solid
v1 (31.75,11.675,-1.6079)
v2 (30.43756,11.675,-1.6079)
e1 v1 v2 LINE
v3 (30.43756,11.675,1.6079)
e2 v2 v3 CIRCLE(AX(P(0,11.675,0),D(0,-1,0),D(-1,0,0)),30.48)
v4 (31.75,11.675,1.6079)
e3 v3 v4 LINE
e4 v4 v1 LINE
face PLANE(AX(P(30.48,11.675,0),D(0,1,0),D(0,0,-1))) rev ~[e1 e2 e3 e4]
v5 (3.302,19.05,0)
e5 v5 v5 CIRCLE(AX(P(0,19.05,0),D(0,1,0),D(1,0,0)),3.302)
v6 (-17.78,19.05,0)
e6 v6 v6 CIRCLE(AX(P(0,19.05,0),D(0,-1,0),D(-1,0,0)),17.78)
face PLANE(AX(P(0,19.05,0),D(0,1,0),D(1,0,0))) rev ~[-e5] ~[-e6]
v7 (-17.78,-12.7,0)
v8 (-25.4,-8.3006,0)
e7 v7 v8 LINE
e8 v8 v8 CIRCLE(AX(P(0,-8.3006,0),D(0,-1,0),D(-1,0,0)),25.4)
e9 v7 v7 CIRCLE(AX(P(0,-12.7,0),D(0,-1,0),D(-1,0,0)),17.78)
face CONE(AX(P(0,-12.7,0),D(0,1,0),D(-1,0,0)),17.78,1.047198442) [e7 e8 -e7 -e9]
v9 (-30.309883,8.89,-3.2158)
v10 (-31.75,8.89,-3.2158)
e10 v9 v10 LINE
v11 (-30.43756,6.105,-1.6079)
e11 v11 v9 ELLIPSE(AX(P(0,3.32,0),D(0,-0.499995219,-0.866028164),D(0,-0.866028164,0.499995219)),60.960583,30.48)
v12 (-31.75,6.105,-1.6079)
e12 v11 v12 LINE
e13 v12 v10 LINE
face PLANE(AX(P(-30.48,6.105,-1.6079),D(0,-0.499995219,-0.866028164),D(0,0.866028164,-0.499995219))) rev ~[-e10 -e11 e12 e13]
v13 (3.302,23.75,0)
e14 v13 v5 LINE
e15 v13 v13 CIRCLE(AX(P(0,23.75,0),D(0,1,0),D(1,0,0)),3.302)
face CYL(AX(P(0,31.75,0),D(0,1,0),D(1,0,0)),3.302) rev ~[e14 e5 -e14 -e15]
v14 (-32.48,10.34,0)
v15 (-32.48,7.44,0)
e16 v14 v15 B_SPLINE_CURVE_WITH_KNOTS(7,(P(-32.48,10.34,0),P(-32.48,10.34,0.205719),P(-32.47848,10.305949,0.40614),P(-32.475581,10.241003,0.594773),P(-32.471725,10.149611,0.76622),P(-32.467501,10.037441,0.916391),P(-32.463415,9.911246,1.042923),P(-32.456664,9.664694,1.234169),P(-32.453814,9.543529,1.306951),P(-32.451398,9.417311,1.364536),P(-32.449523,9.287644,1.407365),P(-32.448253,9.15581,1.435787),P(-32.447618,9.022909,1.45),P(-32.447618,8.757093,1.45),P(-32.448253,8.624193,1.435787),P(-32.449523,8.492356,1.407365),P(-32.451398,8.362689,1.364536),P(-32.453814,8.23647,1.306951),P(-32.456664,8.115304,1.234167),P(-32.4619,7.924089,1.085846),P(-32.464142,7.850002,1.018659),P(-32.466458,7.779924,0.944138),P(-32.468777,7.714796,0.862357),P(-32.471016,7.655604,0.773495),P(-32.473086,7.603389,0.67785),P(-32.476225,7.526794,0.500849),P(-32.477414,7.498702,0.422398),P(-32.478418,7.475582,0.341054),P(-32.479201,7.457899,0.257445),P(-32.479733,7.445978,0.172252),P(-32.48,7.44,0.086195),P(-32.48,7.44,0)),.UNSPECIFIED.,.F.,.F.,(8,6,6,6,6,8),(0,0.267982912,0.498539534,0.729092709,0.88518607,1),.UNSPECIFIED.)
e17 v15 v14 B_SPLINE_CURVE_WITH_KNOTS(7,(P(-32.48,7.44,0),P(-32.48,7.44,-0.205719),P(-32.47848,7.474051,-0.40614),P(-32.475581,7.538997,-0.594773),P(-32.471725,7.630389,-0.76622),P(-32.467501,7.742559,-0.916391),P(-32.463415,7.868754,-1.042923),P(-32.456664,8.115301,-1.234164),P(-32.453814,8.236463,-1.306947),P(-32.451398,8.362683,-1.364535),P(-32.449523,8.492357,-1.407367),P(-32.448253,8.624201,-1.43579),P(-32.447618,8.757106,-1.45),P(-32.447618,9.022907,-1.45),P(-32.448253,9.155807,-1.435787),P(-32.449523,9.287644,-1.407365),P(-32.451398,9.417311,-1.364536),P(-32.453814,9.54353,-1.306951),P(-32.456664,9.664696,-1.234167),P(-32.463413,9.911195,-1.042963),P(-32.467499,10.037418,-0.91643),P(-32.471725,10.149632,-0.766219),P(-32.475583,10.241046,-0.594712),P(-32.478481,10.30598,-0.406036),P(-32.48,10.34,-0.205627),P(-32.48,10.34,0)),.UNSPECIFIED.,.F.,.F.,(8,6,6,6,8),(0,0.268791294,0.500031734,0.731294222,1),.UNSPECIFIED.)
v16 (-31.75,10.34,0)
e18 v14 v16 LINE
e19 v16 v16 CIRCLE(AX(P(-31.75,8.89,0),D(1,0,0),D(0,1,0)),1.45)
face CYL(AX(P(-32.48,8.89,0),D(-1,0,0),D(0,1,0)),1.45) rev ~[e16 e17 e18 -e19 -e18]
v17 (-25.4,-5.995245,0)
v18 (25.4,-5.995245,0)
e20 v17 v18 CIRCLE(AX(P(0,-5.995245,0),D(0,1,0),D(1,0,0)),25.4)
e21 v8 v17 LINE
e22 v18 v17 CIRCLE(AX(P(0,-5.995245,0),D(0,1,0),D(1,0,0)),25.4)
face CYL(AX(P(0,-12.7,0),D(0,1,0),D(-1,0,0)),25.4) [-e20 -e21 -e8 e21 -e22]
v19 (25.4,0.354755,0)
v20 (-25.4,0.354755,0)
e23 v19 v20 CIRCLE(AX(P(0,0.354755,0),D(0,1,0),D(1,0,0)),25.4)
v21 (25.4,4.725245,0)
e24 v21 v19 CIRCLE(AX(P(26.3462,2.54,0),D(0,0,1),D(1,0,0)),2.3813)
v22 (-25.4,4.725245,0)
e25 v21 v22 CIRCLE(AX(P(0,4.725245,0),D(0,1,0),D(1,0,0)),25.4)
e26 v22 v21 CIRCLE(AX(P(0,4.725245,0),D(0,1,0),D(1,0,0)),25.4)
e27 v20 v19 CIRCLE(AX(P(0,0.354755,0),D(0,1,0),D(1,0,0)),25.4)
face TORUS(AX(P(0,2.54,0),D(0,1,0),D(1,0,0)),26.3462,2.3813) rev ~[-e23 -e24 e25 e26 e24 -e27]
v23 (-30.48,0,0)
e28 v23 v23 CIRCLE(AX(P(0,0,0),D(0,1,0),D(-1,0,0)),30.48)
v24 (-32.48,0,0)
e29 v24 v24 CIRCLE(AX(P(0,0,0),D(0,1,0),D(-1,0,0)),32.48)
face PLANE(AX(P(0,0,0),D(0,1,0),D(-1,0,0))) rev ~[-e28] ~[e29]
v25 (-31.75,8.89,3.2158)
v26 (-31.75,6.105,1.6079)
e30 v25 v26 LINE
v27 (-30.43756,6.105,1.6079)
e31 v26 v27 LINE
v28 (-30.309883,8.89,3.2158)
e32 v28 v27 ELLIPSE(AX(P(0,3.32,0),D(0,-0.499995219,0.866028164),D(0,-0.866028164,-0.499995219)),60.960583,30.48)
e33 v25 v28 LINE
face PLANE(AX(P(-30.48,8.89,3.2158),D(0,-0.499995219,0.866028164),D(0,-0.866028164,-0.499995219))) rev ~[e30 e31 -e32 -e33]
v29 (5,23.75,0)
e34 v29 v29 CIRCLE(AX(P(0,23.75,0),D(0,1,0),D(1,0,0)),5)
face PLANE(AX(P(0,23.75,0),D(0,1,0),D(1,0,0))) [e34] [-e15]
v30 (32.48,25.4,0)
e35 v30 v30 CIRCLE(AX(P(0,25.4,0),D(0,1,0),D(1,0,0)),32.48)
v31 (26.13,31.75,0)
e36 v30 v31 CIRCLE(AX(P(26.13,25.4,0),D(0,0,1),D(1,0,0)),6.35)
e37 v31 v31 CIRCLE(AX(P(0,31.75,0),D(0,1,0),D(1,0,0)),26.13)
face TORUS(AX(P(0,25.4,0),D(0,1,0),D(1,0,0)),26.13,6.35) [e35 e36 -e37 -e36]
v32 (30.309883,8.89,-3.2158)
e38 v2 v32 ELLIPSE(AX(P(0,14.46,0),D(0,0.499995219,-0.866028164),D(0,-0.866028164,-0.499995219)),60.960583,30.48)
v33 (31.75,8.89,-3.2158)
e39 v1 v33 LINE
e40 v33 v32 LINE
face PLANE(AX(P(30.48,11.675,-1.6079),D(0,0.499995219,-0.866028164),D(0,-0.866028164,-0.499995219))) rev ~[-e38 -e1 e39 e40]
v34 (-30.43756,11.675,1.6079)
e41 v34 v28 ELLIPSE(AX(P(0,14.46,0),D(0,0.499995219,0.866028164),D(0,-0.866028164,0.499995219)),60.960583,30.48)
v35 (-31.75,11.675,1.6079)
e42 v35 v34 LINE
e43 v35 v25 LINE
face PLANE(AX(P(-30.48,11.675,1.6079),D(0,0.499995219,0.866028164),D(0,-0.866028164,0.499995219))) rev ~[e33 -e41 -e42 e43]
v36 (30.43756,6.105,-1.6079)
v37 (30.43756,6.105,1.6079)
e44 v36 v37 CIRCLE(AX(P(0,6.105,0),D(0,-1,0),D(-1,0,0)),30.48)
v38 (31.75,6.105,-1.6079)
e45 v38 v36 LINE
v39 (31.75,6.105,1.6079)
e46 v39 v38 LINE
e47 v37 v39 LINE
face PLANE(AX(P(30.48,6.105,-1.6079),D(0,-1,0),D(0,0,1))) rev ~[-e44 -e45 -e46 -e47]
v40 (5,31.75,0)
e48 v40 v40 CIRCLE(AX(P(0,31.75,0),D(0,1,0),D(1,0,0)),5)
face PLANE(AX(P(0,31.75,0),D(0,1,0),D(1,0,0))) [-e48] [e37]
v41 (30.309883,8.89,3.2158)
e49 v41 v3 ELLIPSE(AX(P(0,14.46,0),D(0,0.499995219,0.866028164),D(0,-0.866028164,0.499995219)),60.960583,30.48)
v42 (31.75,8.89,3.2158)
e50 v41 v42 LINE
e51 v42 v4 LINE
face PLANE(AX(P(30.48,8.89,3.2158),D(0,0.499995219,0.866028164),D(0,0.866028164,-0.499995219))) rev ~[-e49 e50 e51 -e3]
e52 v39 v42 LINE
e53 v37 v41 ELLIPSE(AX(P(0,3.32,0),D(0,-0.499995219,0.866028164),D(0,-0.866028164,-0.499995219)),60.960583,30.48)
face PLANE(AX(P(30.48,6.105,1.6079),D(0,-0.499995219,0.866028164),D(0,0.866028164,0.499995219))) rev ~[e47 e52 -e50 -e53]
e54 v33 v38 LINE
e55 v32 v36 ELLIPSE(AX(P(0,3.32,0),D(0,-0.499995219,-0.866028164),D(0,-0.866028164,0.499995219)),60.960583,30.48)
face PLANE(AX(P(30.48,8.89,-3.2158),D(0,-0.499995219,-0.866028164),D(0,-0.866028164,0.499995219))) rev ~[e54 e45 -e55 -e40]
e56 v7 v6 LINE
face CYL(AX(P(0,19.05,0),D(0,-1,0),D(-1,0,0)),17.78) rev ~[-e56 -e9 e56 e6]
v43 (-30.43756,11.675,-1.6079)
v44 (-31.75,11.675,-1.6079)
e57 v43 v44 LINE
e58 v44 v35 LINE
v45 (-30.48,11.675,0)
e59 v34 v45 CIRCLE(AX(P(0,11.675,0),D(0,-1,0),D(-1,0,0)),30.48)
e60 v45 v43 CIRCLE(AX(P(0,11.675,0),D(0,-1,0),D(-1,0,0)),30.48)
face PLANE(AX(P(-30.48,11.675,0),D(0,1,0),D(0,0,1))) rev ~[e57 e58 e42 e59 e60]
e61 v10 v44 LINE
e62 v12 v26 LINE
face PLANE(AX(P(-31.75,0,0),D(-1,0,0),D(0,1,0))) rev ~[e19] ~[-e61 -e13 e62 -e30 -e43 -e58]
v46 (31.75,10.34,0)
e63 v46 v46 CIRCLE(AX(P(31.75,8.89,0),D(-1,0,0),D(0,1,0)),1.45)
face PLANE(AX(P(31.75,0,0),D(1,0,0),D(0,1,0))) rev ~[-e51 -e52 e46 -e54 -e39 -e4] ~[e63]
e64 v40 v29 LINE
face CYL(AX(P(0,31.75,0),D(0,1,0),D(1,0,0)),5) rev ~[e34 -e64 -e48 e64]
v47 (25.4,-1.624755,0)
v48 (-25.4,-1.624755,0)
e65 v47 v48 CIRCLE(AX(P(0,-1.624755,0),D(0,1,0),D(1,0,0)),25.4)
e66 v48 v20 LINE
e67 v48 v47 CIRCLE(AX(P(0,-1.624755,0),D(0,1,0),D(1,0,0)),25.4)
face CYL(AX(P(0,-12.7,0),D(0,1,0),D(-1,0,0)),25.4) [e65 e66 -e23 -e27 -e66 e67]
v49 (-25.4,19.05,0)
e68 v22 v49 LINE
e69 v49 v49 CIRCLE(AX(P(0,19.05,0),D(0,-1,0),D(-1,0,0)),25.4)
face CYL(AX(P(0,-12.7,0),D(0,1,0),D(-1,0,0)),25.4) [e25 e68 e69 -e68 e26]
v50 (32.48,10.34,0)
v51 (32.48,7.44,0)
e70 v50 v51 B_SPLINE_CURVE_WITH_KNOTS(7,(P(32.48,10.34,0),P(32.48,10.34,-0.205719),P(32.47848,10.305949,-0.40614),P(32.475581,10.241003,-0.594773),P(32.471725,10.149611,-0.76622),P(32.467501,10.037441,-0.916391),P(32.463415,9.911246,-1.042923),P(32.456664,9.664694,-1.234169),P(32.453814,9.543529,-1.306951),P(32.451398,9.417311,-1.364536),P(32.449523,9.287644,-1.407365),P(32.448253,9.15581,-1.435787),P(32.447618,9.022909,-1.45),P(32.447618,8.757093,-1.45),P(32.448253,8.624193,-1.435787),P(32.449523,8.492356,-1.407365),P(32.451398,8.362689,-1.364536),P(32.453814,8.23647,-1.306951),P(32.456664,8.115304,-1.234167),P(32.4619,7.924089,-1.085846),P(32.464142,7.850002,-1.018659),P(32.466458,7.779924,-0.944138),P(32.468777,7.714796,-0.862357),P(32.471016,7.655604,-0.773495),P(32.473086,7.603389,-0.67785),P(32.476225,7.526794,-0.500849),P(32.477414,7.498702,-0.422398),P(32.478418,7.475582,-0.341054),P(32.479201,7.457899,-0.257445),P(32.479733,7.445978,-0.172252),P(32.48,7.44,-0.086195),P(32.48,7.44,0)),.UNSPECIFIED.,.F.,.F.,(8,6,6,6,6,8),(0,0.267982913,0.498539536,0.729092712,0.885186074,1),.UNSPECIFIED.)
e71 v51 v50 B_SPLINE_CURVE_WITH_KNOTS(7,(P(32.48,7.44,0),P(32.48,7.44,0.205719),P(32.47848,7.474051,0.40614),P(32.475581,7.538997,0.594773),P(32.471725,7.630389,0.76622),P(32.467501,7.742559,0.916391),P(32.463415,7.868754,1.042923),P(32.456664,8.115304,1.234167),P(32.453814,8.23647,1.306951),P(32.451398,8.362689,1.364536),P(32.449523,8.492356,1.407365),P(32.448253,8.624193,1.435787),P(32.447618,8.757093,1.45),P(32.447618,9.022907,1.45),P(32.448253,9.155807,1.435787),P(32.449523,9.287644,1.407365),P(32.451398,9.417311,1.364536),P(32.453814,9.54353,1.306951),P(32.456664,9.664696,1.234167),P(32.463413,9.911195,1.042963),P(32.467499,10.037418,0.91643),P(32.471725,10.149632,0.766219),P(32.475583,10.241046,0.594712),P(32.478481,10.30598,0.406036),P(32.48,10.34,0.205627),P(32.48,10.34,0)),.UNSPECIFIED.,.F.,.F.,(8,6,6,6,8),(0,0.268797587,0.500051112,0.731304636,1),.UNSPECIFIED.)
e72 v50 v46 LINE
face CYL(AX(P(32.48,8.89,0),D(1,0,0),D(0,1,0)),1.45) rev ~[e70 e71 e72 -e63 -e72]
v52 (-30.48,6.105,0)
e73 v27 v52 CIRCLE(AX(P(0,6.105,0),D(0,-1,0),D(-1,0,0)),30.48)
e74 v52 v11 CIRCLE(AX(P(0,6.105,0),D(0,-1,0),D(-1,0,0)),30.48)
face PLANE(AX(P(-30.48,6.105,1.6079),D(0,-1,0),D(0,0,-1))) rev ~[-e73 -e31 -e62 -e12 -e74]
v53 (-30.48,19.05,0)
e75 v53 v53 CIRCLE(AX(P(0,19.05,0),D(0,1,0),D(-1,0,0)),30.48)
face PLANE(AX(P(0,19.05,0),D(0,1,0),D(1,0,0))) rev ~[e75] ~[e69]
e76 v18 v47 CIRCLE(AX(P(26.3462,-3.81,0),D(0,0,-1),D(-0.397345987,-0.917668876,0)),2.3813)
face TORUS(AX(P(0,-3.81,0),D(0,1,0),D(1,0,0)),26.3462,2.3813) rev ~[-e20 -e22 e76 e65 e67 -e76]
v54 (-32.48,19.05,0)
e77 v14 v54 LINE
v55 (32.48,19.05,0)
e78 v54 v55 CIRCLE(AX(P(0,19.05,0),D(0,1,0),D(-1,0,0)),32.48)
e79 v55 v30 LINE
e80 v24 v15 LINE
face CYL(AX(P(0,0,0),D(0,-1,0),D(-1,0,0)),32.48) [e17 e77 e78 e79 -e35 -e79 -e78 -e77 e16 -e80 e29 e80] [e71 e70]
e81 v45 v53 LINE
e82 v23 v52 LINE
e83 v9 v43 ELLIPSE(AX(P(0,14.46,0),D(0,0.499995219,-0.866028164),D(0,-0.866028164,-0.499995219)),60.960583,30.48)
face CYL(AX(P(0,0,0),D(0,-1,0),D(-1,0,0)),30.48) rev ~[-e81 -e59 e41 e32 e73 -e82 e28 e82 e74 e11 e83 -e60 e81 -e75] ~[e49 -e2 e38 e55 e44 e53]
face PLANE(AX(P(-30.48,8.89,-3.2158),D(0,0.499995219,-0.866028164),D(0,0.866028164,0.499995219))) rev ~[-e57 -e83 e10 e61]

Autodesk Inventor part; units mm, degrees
ref_plane "XZ Plane" through (0, 0, 0) normal (0, 1, 0) x (-1, 0, 0)
sketch "Sketch1" plane through (0, 0, 0) normal (0, 1, 0) x (-1, 0, 0)
  circle A0 centre (0, 0) radius 30.48
  circle A1 centre (0, 0) radius 32.48
  dimension "d0" = 60.96
  dimension "d2" = 2
extrude "Extrusion1" add sketch "Sketch1" along normal blind 19.05
sketch "Sketch2" plane through (0, 19.05, 0) normal (0, 1, 0) x (1, 0, 0)
  circle A0 centre (0, 0) radius 32.48
  circle A1 centre (0, 0) radius 32.48 projected
extrude "Extrusion2" add sketch "Sketch2" along normal blind 12.7
fillet "Fillet1" radius 6.35 1 edges at (-32.48, 31.75, 0)
sketch "Sketch6" plane through (0, 31.75, 0) normal (0, 1, 0) x (1, 0, 0)
  circle A0 centre (0, 0) radius 3.302
  dimension "d15" = 6.604
extrude "Extrusion5" cut sketch "Sketch6" against normal up to surface (12.7 mm away)
sketch "Sketch10" plane through (0, 0, 0) normal (0, 0, 1) x (1, 0, 0)
  line L0 (-17.78, 19.05) -> (-17.78, -12.7)
  line L1 (-17.78, -12.7) -> (-25.4, -12.7)
  line L2 (-25.4, -12.7) -> (-25.4, 19.05)
  line L3 (-17.78, 19.05) -> (-25.4, 19.05)
  line L4 (-26.13, 31.75) -> (26.13, 31.75) projected
  line L5 (0, 31.75) -> (0, 0)
  line L6 (32.48, 0) -> (-32.48, 0) projected
  line L7 (-30.48, 0) -> (-30.48, 19.05)
  line L8 (-17.78, -12.7) -> (-25.4, -8.3006)
  line L9 (-30.48, 19.05) -> (30.48, 19.05) projected
  point P0 (-30.48, 0)
  point P1 (-25.4, 19.05)
  dimension "d29" = 7.62
  dimension "d33" = 30
  dimension "d42" = 25.4
  dimension "d89" = 31.75
revolve "Revolution2" add sketch "Sketch10" angle 360 about axis through (0, 31.75, 0) along (0, -1, 0) contours L0 L6 L2 L3 | L0 L8 L2 L6
sketch "Sketch11" plane through (0, 0, 0) normal (0, 0, 1) x (1, 0, 0)
  line L0 (25.4, -7.0306) -> (25.4, 25.4)
  circle A0 centre (26.3462, -3.81) radius 2.3813
  circle A1 centre (26.3462, 2.54) radius 2.3813
  line L1 (0, -11.43) -> (0, 31.75)
  line L2 (-26.13, 31.75) -> (26.13, 31.75) projected
  line L3 (26.3462, 2.54) -> (26.3462, -3.81)
  line L4 (30.48, 19.05) -> (30.48, 0) projected
  line L5 (30.48, 0) -> (29.972, 19.05)
  line L6 (29.972, 19.05) -> (29.972, 0) projected
  line L7 (-25.4, -5.08) -> (25.4, -5.08) projected
  line L8 (-17.78, -12.7) -> (17.78, -12.7) projected
  point P0 (0, 0)
  point P1 (25.4, -8.3006)
  point P2 (27.772, -0.6806)
  point P3 (17.78, -12.7)
  dimension "d36" = 6.35
  dimension "d37" = 4.7625
  dimension "d38" = 4.7625
  dimension "d43" = 26.3462
  dimension "d91" = 8.89
revolve "Revolution3" cut sketch "Sketch11" angle 360 about axis through (0, -11.43, 0) along (0, 1, 0) contours A0 L7 L0 | L0 A0 | L7 A0 L0 | A1 L0 | L0 A1
sketch "Sketch23" plane through (0, 31.75, 0) normal (0, 1, 0) x (1, 0, 0)
  circle A0 centre (0, 0) radius 5
  dimension "d103" = 10
extrude "Extrusion15" cut sketch "Sketch23" against normal blind 8
ref_plane "Work Plane4" through (-32.48, 0, 0) normal (1, 0, 0) x (0, 1, 0)
sketch "Sketch24" plane through (-32.48, 0, 0) normal (1, 0, 0) x (0, 1, 0)
  circle A0 centre (8.89, 0) radius 1.45
  line L0 (0, -32.48) -> (0, 32.48) projected
  line L1 (31.75, 5) -> (31.75, -5) projected
  line L2 (31.75, 0) -> (0, 0) construction
  line L3 (-1.6248, -25.4) -> (-1.6248, 25.4) projected
  dimension "d106" = 2.9
  dimension "d107" = 8.89
  dimension "d108" = 0
extrude "Extrusion16" cut sketch "Sketch24" along normal up to surface
pattern_circular "Circular Pattern4" count 2 over 360 about axis through (0, 31.75, 0) along (0, -1, 0) of "Extrusion16"
ref_plane "Work Plane5" through (30.48, 0, 0) normal (1, 0, 0) x (0, 1, 0)
sketch "Sketch25" plane through (30.48, 0, 0) normal (1, 0, 0) x (0, 1, 0)
  line L0 (31.75, 5) -> (31.75, -5) projected
  line L1 (31.75, 0) -> (-12.7, 0)
  line L2 (-12.7, 17.78) -> (-12.7, -17.78) projected
  line L3 (11.675, -1.6079) -> (8.89, -3.2158)
  line L4 (8.89, -3.2158) -> (6.105, -1.6079)
  line L5 (6.105, -1.6079) -> (6.105, 1.6079)
  line L6 (6.105, 1.6079) -> (8.89, 3.2158)
  line L7 (8.89, 3.2158) -> (11.675, 1.6079)
  line L8 (11.675, 1.6079) -> (11.675, -1.6079)
  line L9 (0, -32.48) -> (0, 32.48) projected
  circle A0 centre (8.89, 0) radius 1.45
  point P0 (0, 0)
  point P1 (11.675, 0)
  dimension "d115" = 8.89
  dimension "d116" = 2.9
  dimension "d117" = 5.57
extrude "Extrusion17" cut sketch "Sketch25" along normal blind 1.27 and the other way blind 0.635 contours L8 L3 L4 L5 L1 A0 | L1 A0 L5 L6 L7 L8
pattern_circular "Circular Pattern5" count 2 over 360 about axis through (0, 31.75, 0) along (0, -1, 0) of "Extrusion17"
properties part number "Water_Sensor_Cap_3DPrint"
